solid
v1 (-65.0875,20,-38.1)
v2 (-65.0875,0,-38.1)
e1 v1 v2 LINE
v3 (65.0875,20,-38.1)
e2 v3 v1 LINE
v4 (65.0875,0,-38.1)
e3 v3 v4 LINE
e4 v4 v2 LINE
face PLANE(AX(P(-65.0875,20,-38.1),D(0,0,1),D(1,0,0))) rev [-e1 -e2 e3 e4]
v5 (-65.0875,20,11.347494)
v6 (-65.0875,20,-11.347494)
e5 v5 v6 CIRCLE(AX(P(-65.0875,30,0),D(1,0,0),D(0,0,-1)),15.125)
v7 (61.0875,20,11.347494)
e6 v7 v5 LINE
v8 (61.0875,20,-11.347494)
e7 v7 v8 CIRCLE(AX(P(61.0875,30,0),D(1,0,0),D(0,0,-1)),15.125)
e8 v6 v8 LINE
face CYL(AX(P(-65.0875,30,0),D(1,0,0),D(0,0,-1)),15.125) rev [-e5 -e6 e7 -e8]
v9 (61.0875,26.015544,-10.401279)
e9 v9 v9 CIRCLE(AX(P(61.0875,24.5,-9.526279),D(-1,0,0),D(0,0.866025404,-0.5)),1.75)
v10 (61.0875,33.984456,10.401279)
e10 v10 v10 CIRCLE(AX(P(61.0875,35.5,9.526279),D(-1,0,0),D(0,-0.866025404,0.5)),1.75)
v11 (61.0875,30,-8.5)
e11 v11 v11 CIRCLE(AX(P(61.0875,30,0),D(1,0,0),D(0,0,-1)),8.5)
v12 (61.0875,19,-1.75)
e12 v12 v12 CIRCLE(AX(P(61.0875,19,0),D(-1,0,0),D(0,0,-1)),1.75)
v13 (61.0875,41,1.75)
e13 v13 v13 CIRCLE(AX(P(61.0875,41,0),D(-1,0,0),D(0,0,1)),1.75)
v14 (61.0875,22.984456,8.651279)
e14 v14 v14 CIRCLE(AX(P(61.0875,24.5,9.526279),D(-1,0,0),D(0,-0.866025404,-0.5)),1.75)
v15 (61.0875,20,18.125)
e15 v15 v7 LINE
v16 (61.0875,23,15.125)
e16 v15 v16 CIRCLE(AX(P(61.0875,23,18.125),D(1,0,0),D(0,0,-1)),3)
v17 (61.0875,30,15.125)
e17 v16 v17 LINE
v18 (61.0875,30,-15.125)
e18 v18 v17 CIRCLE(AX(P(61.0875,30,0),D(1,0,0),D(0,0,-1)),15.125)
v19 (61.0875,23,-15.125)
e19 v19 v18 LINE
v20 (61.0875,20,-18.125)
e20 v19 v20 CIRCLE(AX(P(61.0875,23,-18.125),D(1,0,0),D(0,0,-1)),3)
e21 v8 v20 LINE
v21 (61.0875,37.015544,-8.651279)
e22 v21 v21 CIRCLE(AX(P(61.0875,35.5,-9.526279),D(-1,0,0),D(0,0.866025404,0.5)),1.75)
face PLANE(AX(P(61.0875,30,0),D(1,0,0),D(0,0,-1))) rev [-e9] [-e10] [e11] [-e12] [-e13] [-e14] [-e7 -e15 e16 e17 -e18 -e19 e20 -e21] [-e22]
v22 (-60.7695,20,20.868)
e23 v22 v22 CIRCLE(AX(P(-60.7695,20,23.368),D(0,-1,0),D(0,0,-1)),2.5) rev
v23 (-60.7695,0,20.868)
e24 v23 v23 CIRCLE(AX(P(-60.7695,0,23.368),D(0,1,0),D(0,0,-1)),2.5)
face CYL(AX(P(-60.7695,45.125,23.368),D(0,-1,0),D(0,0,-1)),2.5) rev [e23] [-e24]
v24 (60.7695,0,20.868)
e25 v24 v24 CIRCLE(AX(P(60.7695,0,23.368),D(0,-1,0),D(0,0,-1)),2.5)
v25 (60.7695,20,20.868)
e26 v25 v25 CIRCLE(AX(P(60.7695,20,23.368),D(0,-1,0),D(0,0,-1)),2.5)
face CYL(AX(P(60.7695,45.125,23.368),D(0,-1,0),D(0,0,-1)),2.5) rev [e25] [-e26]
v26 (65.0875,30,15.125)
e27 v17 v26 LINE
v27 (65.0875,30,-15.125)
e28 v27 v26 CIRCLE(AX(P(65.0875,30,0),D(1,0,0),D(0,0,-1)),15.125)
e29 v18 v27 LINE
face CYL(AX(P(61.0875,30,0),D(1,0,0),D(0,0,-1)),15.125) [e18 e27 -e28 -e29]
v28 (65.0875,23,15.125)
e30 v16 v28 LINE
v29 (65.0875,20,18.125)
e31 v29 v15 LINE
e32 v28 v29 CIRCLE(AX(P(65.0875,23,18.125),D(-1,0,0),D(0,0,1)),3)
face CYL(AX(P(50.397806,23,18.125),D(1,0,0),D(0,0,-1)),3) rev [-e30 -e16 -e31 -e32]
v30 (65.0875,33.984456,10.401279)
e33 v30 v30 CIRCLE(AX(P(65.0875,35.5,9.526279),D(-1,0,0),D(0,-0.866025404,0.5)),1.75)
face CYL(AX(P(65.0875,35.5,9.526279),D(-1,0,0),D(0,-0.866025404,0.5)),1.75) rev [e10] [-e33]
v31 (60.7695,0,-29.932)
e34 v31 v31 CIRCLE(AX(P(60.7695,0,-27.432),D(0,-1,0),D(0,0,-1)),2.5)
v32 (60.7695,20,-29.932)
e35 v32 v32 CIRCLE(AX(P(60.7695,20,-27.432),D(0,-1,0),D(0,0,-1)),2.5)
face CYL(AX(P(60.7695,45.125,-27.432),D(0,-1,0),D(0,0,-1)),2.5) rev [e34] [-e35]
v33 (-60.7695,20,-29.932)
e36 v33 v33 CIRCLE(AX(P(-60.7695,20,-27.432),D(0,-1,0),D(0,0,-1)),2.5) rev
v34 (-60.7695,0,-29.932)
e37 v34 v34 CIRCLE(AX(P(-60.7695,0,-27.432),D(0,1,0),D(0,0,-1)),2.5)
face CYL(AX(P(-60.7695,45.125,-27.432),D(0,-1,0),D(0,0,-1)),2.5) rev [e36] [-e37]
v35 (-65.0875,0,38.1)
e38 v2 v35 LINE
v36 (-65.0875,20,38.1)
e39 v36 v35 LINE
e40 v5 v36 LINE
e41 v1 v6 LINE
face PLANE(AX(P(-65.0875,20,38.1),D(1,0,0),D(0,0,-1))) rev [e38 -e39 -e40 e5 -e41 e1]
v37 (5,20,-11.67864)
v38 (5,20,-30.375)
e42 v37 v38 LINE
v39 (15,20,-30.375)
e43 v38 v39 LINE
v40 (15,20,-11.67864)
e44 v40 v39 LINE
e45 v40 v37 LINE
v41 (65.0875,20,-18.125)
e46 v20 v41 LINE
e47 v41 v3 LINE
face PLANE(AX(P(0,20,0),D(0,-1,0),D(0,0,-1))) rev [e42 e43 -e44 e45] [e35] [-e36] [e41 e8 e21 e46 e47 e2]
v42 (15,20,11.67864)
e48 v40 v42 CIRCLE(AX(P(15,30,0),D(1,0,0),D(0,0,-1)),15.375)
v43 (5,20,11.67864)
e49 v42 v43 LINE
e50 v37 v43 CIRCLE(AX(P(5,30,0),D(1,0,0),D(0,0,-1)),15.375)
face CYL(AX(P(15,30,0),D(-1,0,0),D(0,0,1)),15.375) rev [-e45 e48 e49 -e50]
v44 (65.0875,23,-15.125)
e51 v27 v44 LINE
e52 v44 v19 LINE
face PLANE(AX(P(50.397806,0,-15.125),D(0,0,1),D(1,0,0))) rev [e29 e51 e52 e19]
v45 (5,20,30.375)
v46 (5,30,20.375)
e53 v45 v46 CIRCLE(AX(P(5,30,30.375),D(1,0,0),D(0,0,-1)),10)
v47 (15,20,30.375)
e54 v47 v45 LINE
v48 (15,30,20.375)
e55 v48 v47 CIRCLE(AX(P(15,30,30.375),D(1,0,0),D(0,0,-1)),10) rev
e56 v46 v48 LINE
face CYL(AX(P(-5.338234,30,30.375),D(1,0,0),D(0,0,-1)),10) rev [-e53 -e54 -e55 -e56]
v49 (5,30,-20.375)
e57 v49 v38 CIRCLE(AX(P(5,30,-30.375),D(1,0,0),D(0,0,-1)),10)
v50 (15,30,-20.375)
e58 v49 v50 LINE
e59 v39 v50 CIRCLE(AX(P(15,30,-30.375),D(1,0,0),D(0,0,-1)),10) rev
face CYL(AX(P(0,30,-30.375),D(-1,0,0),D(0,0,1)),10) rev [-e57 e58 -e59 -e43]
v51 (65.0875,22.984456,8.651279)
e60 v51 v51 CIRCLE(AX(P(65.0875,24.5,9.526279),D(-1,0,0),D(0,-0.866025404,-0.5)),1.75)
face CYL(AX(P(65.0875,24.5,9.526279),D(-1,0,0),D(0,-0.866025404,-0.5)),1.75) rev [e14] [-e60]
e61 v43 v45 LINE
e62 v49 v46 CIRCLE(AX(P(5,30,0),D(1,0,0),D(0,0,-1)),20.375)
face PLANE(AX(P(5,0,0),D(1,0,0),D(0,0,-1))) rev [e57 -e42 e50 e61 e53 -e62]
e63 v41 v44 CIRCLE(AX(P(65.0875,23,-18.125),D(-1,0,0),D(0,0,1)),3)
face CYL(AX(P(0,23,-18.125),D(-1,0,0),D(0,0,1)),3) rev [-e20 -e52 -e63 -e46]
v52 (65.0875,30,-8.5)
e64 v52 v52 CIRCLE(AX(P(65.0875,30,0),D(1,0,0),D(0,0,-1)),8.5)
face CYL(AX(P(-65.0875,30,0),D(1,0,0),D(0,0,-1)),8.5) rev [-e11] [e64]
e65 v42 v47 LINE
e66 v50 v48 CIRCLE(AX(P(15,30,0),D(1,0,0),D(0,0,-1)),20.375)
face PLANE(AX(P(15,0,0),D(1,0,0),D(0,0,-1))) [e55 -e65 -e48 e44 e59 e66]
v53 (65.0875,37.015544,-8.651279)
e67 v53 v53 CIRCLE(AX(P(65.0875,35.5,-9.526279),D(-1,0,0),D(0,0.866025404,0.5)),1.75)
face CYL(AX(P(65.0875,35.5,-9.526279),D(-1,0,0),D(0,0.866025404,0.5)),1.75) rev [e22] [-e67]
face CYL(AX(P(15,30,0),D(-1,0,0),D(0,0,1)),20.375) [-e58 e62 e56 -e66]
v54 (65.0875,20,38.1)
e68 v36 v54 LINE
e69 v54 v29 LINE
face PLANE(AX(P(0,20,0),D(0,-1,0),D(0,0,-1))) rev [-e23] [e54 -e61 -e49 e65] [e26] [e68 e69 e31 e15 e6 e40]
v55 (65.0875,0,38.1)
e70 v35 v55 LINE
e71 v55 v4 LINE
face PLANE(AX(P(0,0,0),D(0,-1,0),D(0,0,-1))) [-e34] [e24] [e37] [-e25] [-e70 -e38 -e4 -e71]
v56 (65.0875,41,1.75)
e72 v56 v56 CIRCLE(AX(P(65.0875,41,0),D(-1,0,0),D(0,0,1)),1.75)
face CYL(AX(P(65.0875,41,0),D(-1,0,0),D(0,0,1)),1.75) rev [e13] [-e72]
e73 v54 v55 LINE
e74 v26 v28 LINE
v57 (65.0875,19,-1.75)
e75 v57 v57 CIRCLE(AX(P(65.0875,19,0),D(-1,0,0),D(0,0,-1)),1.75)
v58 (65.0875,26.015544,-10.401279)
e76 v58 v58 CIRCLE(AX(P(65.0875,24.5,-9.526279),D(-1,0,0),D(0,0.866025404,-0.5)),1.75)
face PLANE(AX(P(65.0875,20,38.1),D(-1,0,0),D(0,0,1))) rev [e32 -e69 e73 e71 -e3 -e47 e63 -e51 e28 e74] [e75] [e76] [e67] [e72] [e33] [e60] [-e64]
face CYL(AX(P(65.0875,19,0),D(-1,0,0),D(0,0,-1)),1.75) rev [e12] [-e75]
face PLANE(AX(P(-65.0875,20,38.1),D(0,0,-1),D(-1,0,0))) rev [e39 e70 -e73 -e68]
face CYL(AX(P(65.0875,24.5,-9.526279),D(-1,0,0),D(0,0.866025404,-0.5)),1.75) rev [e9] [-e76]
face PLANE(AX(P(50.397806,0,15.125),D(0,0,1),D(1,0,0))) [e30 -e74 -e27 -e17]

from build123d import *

# Parameters (mm, degrees)
SKETCH1_W           = 130.175
SKETCH1_H           = 76.2
BOSS_EXTRUDE1_DEPTH = 20
SKETCH2_R           = 15.125
CUT_EXTRUDE1_DEPTH  = 138.102664544
SKETCH3_R           = 15.125
BOSS_EXTRUDE2_DEPTH = 4
SKETCH4_R           = 1.75
CUT_EXTRUDE2_DEPTH  = 140.31262057
CIRPATTERN1_COUNT   = 6
SKETCH5_R           = 8.5
CUT_EXTRUDE3_DEPTH  = 143.945466
SKETCH6_R           = 2.5
CUT_EXTRUDE4_DEPTH  = 88.887759564
SKETCH8_R           = 20.375
SKETCH8_R_2         = 15.375
BOSS_EXTRUDE3_DEPTH = 5
BOSS_EXTRUDE4_DEPTH = 4
BOSS_EXTRUDE5_START = -5
BOSS_EXTRUDE5_DEPTH = 10
FILLET1_R           = 10
FILLET2_R           = 3


with BuildPart() as part:
    # Sketch1 → Boss-Extrude1 (new body)
    with BuildSketch(Plane(origin=(0, 0, 0), x_dir=(1, 0, 0), z_dir=(0, 1, 0))):
        Rectangle(SKETCH1_W, SKETCH1_H)
    extrude(amount=BOSS_EXTRUDE1_DEPTH)

    # Sketch2 → Cut-Extrude1 (cut, through all)
    with BuildSketch(Plane(origin=(65.0875, 0, 0), x_dir=(0, 0, -1), z_dir=(1, 0, 0))):
        with Locations((0, 30)):
            Circle(SKETCH2_R)
    extrude(amount=-CUT_EXTRUDE1_DEPTH, mode=Mode.SUBTRACT)

    # Sketch3 → Boss-Extrude2 (add)
    with BuildSketch(Plane(origin=(65.0875, 0, 0), x_dir=(0, 0, -1), z_dir=(1, 0, 0))):
        with Locations((0, 30)):
            Circle(SKETCH3_R)
    extrude(amount=-BOSS_EXTRUDE2_DEPTH)

    # Sketch4 → Cut-Extrude2 (cut, through all)
    with BuildSketch(Plane.ZY.offset(-61.0875)):
        with Locations((0, 41)):
            Circle(SKETCH4_R)
    cut_extrude2 = extrude(amount=-CUT_EXTRUDE2_DEPTH, mode=Mode.SUBTRACT)

    # CirPattern1: Cut-Extrude2 ×6 about axis
    cirpattern1_axis = Axis((0, 30, 0), (1, 0, 0))
    for i in range(1, CIRPATTERN1_COUNT):
        add(cut_extrude2.rotate(cirpattern1_axis, i * 360 / CIRPATTERN1_COUNT), mode=Mode.SUBTRACT)

    # Sketch5 → Cut-Extrude3 (cut, through all)
    with BuildSketch(Plane(origin=(65.0875, 0, 0), x_dir=(0, 0, -1), z_dir=(1, 0, 0))):
        with Locations((0, 30)):
            Circle(SKETCH5_R)
    extrude(amount=-CUT_EXTRUDE3_DEPTH, mode=Mode.SUBTRACT)

    # Sketch6 → Cut-Extrude4 (cut, through all)
    with BuildSketch(Plane.XZ):
        with Locations(Location((60.7695, 23.368, 0), (0, 0, 270))):
            Circle(SKETCH6_R)
        with Locations(Location((60.7695, -27.432, 0), (0, 0, 270))):
            Circle(SKETCH6_R)
    cut_extrude4 = extrude(amount=-CUT_EXTRUDE4_DEPTH, mode=Mode.SUBTRACT)

    # Mirror1: Cut-Extrude4 across plane
    add(cut_extrude4.mirror(Plane(origin=(0, 0, 0), x_dir=(0, 0, 1), z_dir=(1, 0, 0))), mode=Mode.SUBTRACT)

    # Sketch8 → Boss-Extrude3 (add, symmetric)
    with BuildSketch(Plane(origin=(10, 0, 0), x_dir=(0, 0, -1), z_dir=(1, 0, 0))):
        with Locations((0, 30)):
            Circle(SKETCH8_R)
        with Locations((0, 30)):
            Circle(SKETCH8_R_2, mode=Mode.SUBTRACT)
    extrude(amount=BOSS_EXTRUDE3_DEPTH, both=True)

    # Sketch9 → Boss-Extrude4 (add)
    with BuildSketch(Plane(origin=(65.0875, 0, 0), x_dir=(0, 0, -1), z_dir=(1, 0, 0))):
        with BuildLine():
            ThreePointArc((-11.347494217, 20), (-14.149142642, 24.655153184), (-15.125, 30))
            Line((-15.125, 30), (-15.125, 20))
            Line((-15.125, 20), (-11.347494217, 20))
        make_face()
        with BuildLine():
            Line((15.125, 20), (15.125, 30))
            ThreePointArc((15.125, 30), (14.149142642, 24.655153184), (11.347494217, 20))
            Line((11.347494217, 20), (15.125, 20))
        make_face()
    extrude(amount=-BOSS_EXTRUDE4_DEPTH)

    # Sketch10 → Boss-Extrude5 (add)
    with BuildSketch(Plane(origin=(10, 0, 0), x_dir=(0, 0, -1), z_dir=(1, 0, 0)).offset(BOSS_EXTRUDE5_START)):
        with BuildLine():
            ThreePointArc((-17.752200568, 20), (-19.708395566, 24.83088313), (-20.375, 30))
            Line((-20.375, 30), (-20.375, 20))
            Line((-20.375, 20), (-17.752200568, 20))
        make_face()
        with BuildLine():
            Line((20.375, 20), (20.375, 30))
            ThreePointArc((20.375, 30), (19.708395566, 24.83088313), (17.752200568, 20))
            Line((17.752200568, 20), (20.375, 20))
        make_face()
    extrude(amount=BOSS_EXTRUDE5_DEPTH)

    # Fillet1
    fillet1_edges = [part.edges().sort_by_distance(p)[0] for p in [
        (10, 20, -20.375),
        (10, 20, 20.375),
    ]]
    fillet(fillet1_edges, radius=FILLET1_R - 0.0001)  # a hair under: the kernel refuses the full size

    # Fillet2
    fillet2_edges = [part.edges().sort_by_distance(p)[0] for p in [
        (63.0875, 20, 15.125),
        (63.0875, 20, -15.125),
    ]]
    fillet(fillet2_edges, radius=FILLET2_R)


solid = part.part
